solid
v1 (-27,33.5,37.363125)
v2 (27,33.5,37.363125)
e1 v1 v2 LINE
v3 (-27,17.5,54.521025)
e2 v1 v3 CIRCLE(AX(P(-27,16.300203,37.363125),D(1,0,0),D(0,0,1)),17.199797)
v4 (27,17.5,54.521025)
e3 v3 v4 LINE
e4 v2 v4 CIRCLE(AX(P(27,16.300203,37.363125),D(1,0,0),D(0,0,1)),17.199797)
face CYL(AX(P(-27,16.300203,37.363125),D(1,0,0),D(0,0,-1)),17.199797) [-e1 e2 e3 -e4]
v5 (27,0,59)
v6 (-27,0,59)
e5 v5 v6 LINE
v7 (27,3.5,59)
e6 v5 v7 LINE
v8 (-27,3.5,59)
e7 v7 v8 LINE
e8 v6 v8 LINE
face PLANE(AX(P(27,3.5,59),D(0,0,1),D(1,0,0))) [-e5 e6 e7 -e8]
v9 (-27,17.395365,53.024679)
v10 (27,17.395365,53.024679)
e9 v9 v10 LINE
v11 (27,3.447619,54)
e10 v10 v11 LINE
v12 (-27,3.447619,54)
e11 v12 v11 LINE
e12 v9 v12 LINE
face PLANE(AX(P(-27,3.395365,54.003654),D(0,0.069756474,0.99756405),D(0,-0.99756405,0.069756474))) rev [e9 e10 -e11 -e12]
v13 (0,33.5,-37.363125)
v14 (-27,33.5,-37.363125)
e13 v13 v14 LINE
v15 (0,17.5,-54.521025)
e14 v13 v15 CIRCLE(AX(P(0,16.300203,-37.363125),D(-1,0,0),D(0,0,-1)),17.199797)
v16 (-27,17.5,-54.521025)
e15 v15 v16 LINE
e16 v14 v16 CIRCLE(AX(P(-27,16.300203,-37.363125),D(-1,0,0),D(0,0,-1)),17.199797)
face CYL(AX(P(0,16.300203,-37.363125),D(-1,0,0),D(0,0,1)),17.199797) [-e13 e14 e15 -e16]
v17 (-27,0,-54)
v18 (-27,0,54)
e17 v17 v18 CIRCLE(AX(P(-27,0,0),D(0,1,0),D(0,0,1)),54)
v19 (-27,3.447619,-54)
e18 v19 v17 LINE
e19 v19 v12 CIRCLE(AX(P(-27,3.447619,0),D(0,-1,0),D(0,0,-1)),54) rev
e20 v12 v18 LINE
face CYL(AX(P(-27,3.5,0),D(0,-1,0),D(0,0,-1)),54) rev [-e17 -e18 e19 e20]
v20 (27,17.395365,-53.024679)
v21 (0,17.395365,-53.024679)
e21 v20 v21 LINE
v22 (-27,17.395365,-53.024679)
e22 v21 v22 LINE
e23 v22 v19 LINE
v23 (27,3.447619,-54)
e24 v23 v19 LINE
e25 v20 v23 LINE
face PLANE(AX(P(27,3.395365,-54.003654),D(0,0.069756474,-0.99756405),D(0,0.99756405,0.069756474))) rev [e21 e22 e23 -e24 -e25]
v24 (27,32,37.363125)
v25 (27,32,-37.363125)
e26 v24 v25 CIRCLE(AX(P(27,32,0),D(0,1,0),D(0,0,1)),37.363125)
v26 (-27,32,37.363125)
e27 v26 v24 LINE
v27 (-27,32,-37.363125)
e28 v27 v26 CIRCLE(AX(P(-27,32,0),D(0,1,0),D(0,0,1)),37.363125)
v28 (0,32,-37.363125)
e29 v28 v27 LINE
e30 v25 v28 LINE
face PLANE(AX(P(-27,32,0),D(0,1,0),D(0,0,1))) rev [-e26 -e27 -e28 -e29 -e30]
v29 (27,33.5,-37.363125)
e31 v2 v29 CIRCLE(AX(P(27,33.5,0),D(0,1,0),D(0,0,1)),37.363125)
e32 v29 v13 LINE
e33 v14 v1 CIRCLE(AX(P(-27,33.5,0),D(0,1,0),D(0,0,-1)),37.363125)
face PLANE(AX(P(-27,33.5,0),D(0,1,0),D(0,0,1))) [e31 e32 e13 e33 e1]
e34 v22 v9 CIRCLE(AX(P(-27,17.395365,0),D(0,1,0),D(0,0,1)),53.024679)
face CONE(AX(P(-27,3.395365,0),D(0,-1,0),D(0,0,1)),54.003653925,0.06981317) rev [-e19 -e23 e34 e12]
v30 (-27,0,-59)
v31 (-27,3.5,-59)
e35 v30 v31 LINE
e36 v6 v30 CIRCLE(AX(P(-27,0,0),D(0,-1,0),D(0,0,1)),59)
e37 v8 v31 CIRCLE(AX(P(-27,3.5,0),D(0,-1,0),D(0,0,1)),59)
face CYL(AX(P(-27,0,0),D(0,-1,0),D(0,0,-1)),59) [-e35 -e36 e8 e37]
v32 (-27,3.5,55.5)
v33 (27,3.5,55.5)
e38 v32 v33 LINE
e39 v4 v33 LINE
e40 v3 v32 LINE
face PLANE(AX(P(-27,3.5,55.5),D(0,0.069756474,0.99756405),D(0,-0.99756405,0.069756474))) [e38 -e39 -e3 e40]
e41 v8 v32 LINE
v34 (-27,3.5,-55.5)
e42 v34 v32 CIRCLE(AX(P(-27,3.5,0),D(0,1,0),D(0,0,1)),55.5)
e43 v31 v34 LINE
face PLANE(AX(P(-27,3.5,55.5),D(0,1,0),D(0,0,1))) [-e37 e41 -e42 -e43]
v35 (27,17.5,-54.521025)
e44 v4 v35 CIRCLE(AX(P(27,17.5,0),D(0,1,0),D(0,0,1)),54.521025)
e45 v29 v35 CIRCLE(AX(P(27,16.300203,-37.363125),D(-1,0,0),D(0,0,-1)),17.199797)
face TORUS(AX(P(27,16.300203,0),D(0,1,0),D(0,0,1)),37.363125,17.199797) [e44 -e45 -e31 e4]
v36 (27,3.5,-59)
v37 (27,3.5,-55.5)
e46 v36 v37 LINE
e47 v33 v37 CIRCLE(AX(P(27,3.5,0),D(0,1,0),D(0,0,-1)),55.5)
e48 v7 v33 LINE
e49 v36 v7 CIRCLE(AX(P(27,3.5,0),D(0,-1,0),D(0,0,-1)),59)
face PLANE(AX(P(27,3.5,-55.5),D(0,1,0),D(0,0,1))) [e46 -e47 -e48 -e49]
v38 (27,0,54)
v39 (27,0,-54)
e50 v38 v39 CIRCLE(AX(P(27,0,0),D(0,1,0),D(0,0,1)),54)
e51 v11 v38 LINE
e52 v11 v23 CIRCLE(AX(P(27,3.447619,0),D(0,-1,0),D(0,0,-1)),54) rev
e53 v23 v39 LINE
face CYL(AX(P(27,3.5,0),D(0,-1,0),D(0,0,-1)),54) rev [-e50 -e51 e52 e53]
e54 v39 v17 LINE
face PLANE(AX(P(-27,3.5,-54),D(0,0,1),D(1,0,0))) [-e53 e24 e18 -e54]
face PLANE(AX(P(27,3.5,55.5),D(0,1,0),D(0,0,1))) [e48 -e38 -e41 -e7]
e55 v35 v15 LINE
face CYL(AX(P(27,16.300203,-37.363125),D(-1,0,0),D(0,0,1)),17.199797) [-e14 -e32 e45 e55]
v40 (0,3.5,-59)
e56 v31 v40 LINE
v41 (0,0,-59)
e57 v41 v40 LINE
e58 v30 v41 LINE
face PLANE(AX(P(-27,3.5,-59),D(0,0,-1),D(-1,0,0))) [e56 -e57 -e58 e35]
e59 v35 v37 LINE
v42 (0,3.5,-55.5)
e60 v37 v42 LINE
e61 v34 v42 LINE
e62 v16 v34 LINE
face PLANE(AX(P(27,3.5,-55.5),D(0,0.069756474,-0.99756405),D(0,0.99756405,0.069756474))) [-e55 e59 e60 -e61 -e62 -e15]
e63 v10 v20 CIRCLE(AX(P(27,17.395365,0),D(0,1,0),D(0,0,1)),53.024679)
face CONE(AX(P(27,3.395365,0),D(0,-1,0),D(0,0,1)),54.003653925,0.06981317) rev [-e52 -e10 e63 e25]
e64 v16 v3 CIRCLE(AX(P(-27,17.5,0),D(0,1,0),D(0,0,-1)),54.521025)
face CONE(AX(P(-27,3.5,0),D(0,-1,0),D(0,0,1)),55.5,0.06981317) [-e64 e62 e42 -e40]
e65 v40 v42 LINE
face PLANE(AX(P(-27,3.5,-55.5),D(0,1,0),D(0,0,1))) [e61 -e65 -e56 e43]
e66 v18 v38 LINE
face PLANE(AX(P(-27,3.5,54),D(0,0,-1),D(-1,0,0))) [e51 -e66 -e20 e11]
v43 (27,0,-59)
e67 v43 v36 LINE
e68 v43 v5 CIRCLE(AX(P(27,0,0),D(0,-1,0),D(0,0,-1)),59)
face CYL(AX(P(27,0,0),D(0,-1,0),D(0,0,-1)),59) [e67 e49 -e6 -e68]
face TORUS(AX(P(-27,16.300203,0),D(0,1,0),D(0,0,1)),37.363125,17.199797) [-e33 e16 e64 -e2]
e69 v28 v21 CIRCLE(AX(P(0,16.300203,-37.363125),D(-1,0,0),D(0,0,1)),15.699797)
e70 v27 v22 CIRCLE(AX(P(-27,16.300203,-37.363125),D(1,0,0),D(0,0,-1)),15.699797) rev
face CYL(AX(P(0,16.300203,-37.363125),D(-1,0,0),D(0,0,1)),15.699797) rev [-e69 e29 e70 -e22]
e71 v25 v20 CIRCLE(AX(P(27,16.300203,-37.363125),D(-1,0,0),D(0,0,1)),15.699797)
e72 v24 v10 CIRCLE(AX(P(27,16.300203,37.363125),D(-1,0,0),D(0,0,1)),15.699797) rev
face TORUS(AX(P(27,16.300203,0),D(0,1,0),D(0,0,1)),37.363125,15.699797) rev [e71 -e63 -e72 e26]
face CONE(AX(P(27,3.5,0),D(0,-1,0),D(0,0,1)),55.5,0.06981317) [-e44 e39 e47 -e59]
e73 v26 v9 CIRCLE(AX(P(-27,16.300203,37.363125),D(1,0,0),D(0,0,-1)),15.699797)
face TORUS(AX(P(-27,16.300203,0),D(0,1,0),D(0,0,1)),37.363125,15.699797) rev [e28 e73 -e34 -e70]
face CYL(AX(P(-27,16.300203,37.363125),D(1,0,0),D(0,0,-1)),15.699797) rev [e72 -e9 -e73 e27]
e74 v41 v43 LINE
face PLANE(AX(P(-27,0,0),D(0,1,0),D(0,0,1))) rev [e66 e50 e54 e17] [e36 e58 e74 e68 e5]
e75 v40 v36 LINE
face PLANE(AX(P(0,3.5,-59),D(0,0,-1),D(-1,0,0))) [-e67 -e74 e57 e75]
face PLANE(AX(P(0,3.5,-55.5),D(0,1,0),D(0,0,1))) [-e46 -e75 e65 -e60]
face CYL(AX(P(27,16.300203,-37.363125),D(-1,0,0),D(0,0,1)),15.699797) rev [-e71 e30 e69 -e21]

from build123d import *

# Parameters (mm, degrees)
BOSS_EXTRUDE1_DEPTH = 3.5
BOSS_EXTRUDE2_DEPTH = 30
BOSS_EXTRUDE2_TAPER = 4
SHELL1_START        = -27
SHELL1_DEPTH        = 54
SKETCH9_W           = 3.5
SKETCH9_H           = 3.5


with BuildPart() as part:
    # Sketch1 → Boss-Extrude1 (new body)
    with BuildSketch(Plane(origin=(0, 0, 0), x_dir=(1, 0, 0), z_dir=(0, 1, 0))):
        with BuildLine():
            Line((-27, 55.5), (27, 55.5))
            ThreePointArc((27, 55.5), (82.5, 0), (27, -55.5))
            Line((27, -55.5), (-27, -55.5))
            ThreePointArc((-27, -55.5), (-82.5, 0), (-27, 55.5))
        make_face()
    extrude(amount=BOSS_EXTRUDE1_DEPTH)

    # Sketch6 → Boss-Extrude2 (add)
    with BuildSketch(Plane(origin=(0, 3.5, 0), x_dir=(1, 0, 0), z_dir=(0, 1, 0))):
        with BuildLine():
            Line((-27, -55.5), (27, -55.5))
            ThreePointArc((27, -55.5), (82.5, 0), (27, 55.5))
            Line((27, 55.5), (-27, 55.5))
            ThreePointArc((-27, 55.5), (-82.5, 0), (-27, -55.5))
        make_face()
    extrude(amount=BOSS_EXTRUDE2_DEPTH, taper=BOSS_EXTRUDE2_TAPER)

    # Cut-Sweep5: sweep along a path in Sketch8
    with BuildLine(Plane(origin=(0, 33.5, 0), x_dir=(1, 0, 0), z_dir=(0, 1, 0))) as cut_sweep5_path:
        Line((-27, -53.402195642), (27, -53.402195642))
        ThreePointArc((27, -53.402195642), (80.402195642, 0), (27, 53.402195642))
        Line((27, 53.402195642), (-27, 53.402195642))
        ThreePointArc((-27, 53.402195642), (-80.402195642, 0), (-27, -53.402195642))
    # Sketch7 → Cut-Sweep5 (sweep, cut)
    with BuildSketch(Plane(origin=(0, 0, 0), x_dir=(0, 0, -1), z_dir=(1, 0, 0))):
        with BuildLine():
            Line((37.363125272, 33.5), (37.363125272, 41.316863161))
            Line((37.363125272, 41.316863161), (63.973400916, 41.316863161))
            Line((63.973400916, 41.316863161), (63.973400916, 17.5))
            Line((63.973400916, 17.5), (54.521024633, 17.5))
            ThreePointArc((54.521024633, 17.5), (49.093358758, 28.879338149), (37.363125272, 33.5))
        make_face()
    sweep(path=cut_sweep5_path.line, mode=Mode.SUBTRACT)

    # Shell1: read off the stored shape, not the designer's step
    # Shell1 outline → Shell1 (cut)
    with BuildSketch(Plane.YZ.offset(SHELL1_START)):
        with BuildLine():
            ThreePointArc((32, 37.363125272), (27.782307596, 48.070361217), (17.395365289, 53.024678557))
            Line((17.395365289, 53.024678557), (3.447618846, 54))
            Line((3.447618846, 54), (0, 54))
            Line((0, 54), (0, -54))
            Line((0, -54), (3.447618846, -54))
            Line((3.447618846, -54), (17.395365289, -53.024678557))
            ThreePointArc((17.395365289, -53.024678557), (27.782307596, -48.070361217), (32, -37.363125272))
            Line((32, -37.363125272), (32, 37.363125272))
        make_face()
    extrude(amount=SHELL1_DEPTH, mode=Mode.SUBTRACT)

    # Shell1 2 outline → Shell1 2 (revolve, cut)
    with BuildSketch(Plane(origin=(-27, 0, 0), x_dir=(1, 0, 0), z_dir=(0, 0, 1))):
        with BuildLine():
            Line((54, 3.447618846), (53.024678557, 17.395365289))
            ThreePointArc((53.024678557, 17.395365289), (48.070361217, 27.782307596), (37.363125272, 32))
            Line((37.363125272, 32), (0, 32))
            Line((0, 32), (0, 0))
            Line((0, 0), (54, 0))
            Line((54, 0), (54, 3.447618846))
        make_face()
    revolve(axis=Axis((-27, 0, 0), (0, 1, 0)), mode=Mode.SUBTRACT)

    # Shell1 3 outline → Shell1 3 (revolve, cut)
    with BuildSketch(Plane(origin=(27, 0, 0), x_dir=(1, 0, 0), z_dir=(0, 0, 1))):
        with BuildLine():
            Line((54, 3.447618846), (53.024678557, 17.395365289))
            ThreePointArc((53.024678557, 17.395365289), (48.070361217, 27.782307596), (37.363125272, 32))
            Line((37.363125272, 32), (0, 32))
            Line((0, 32), (0, 0))
            Line((0, 0), (54, 0))
            Line((54, 0), (54, 3.447618846))
        make_face()
    revolve(axis=Axis((27, 0, 0), (0, 1, 0)), mode=Mode.SUBTRACT)

    # Sweep1: sweep along a path in Sketch10
    with BuildLine(Plane.XZ) as sweep1_path:
        Line((27, -55.5), (-27, -55.5))
        ThreePointArc((-27, -55.5), (-82.5, 0), (-27, 55.5))
        Line((-27, 55.5), (27, 55.5))
        ThreePointArc((27, 55.5), (82.5, 0), (27, -55.5))
    # Sketch9 → Sweep1 (sweep)
    with BuildSketch(Plane(origin=(0, 0, 0), x_dir=(0, 0, -1), z_dir=(1, 0, 0))):
        with Locations((57.25, 1.75)):
            Rectangle(SKETCH9_W, SKETCH9_H)
    sweep(path=sweep1_path.line)


solid = part.part
